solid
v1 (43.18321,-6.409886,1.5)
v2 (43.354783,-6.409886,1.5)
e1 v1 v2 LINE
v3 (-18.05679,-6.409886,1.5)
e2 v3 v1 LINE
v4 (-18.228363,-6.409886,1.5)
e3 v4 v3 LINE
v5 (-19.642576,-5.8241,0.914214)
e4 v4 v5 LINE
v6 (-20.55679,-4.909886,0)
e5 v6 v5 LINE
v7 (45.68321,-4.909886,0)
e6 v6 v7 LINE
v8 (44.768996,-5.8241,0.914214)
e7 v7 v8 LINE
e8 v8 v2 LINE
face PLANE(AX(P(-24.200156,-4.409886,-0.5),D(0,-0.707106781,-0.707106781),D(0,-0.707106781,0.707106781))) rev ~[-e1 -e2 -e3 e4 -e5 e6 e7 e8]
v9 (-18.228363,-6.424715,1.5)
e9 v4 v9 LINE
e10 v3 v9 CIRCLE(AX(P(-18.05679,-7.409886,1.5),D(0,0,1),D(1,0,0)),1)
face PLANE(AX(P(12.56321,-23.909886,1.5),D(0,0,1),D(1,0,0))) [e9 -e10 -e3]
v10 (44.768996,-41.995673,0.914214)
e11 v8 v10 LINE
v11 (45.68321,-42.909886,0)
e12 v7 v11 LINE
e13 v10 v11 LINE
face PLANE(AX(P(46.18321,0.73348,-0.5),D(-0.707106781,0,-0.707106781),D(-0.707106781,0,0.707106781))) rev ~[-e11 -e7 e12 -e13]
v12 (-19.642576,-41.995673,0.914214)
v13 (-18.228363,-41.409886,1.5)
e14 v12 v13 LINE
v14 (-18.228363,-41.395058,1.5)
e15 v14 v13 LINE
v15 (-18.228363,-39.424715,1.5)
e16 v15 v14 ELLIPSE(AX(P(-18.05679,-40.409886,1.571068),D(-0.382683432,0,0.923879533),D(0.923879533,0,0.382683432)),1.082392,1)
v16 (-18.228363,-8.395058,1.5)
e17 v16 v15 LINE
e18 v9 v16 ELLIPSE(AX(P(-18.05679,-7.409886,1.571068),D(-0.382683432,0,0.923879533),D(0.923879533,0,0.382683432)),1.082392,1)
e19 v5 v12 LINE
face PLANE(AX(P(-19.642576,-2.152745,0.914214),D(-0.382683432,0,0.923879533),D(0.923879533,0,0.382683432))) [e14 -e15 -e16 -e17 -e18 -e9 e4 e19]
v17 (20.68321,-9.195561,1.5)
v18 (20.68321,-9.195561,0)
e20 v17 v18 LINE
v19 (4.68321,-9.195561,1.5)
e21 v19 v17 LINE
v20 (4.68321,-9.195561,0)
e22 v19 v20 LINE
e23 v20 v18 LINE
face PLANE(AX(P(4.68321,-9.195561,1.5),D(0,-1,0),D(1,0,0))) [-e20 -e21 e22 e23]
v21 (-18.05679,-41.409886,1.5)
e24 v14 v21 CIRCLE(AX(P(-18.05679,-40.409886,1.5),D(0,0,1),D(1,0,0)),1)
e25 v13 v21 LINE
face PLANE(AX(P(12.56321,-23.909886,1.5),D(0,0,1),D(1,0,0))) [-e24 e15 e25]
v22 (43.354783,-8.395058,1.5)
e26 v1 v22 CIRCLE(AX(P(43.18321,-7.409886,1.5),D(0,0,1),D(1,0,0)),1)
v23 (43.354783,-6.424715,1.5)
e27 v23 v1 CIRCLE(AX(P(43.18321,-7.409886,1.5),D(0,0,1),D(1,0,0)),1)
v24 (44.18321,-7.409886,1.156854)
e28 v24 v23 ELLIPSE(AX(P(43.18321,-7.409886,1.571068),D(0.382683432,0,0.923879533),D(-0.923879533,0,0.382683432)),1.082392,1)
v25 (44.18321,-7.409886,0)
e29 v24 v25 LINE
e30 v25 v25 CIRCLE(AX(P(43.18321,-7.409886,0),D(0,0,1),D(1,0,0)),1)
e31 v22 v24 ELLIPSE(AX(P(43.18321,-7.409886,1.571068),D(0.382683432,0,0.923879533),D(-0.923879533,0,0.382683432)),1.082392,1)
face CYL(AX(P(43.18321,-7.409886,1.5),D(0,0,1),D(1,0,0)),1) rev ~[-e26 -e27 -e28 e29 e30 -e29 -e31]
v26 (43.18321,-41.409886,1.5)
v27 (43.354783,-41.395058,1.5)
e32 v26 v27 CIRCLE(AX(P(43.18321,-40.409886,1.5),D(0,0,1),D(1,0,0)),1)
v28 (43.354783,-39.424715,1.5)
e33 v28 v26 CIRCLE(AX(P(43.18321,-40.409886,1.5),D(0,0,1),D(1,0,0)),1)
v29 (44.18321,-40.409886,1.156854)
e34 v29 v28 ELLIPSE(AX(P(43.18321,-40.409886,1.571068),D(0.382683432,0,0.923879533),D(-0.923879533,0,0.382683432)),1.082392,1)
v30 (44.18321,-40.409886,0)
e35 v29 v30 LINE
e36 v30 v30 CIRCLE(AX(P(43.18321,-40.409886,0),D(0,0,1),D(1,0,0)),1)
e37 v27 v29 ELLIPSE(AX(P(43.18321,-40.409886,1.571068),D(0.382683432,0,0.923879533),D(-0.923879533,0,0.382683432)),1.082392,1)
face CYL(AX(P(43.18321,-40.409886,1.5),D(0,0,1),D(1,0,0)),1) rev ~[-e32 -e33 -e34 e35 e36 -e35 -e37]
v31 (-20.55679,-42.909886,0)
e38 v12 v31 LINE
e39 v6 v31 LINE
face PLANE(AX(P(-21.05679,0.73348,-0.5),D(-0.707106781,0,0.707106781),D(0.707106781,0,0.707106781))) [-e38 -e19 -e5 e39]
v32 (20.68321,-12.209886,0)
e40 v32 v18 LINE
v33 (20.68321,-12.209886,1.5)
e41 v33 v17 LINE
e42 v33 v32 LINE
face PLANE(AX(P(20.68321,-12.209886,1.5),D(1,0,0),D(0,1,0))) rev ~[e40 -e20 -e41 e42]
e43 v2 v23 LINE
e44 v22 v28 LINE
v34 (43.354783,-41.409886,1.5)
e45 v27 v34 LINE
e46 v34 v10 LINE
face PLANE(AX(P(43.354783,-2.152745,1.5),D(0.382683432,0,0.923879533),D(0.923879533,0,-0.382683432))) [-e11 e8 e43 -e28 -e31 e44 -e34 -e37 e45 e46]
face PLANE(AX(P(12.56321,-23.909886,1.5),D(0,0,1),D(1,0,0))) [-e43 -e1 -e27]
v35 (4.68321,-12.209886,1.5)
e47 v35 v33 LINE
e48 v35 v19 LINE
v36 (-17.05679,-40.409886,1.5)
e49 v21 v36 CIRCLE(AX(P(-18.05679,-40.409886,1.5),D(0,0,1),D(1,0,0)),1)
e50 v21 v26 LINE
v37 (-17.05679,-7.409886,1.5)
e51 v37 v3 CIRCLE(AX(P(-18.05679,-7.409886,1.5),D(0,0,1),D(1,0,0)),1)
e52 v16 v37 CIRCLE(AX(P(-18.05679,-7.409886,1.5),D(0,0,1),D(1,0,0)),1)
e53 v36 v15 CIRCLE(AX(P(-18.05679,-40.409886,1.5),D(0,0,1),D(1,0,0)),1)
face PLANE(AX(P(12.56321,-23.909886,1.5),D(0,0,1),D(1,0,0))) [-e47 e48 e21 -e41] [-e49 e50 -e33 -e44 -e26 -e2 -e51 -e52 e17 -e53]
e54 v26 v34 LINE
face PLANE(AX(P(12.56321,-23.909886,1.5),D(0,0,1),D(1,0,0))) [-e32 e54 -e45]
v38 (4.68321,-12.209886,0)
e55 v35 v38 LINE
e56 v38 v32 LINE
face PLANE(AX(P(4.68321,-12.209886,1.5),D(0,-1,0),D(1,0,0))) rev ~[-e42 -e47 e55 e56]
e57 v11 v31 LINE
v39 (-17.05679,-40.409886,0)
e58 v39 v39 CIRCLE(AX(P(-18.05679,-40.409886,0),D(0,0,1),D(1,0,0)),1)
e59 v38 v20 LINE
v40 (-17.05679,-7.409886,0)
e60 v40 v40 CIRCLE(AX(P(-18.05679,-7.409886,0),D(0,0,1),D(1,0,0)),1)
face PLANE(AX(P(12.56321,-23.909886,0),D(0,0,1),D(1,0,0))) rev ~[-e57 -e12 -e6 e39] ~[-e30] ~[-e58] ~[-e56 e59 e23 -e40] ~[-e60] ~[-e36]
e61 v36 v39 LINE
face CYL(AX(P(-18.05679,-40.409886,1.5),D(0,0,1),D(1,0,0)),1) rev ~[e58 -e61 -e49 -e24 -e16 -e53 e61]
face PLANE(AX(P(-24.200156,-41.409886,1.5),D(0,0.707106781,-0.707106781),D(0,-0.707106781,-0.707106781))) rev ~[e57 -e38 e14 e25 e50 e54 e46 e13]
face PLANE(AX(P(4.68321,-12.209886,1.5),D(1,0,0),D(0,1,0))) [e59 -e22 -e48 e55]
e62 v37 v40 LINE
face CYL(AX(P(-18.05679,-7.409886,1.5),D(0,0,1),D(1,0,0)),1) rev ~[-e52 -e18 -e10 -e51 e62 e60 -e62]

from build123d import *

# Parameters (mm, degrees)
F0_W        = 67.24
F0_H        = 39
F1_DEPTH    = 1.5
F2_T1_DEPTH = 49.2867319519
F3_T1_DEPTH = 73.5267319519
F3_T3_DEPTH = 43.5142834408
F4_R        = 1
F5_DEPTH    = 2
F6_W        = 16
F6_H        = 3.0143252599
F7_DEPTH    = 2


# Not quite as in the source:
# - a fillet or chamfer that OpenCascade refuses, or shapes differently, is made with other operations: its cross-section is extruded or revolved along the edge and cut away or added


with BuildPart() as f1:
    # F0 (on Top) → F1 (new body)
    with BuildSketch(Plane.XY):
        with Locations((12.5632099807, -23.9098862686)):
            Rectangle(F0_W, F0_H)
    extrude(amount=F1_DEPTH)

    # F2: chamfer of 2 on 2 edges, made by hand

    # F2_s2 → F2_t1 (cut)
    with BuildSketch(Plane.XZ.offset(-0.7334797074)):
        Polygon((46.1832099807, -0.5), (44.1832099807, 1.5), (46.1832099807, 1.5), align=None)
        Polygon((-21.0567900193, -0.5), (-19.0567900193, 1.5), (-21.0567900193, 1.5), align=None)
    extrude(amount=F2_T1_DEPTH, mode=Mode.SUBTRACT)

    # F3: chamfer of 2 on 4 edges, made by hand

    # F3_s2 → F3_t1 (cut)
    with BuildSketch(Plane.YZ.offset(-24.2001559952)):
        Polygon((-4.4098862686, -0.5), (-6.4098862686, 1.5), (-4.4098862686, 1.5), align=None)
        Polygon((-41.4098862686, 1.5), (-43.4098862686, -0.5), (-43.4098862686, 1.5), align=None)
    extrude(amount=F3_T1_DEPTH, mode=Mode.SUBTRACT)

    # F3_s4 → F3_t3 (cut)
    with BuildSketch(Plane.XZ.offset(2.1527445482)):
        Polygon((43.354782856, 1.5), (44.7689964183, 0.9142135624), (44.1832099807, 1.5), align=None)
        Polygon((-19.6425764569, 0.9142135624), (-18.2283628946, 1.5), (-19.0567900193, 1.5), align=None)
    extrude(amount=F3_T3_DEPTH, mode=Mode.SUBTRACT)

    # F4 (on face) → F5 (cut)
    with BuildSketch(Plane.XY.offset(1.5)):
        with Locations((43.1832099807, -40.4098862686)):
            Circle(F4_R)
        with Locations((43.1832099807, -7.4098862686)):
            Circle(F4_R)
        with Locations((-18.0567900193, -40.4098862686)):
            Circle(F4_R)
        with Locations((-18.0567900193, -7.4098862686)):
            Circle(F4_R)
    extrude(amount=-F5_DEPTH, mode=Mode.SUBTRACT)

    # F6 (on face) → F7 (cut)
    with BuildSketch(Plane.XY.offset(1.5)):
        with Locations((12.6832099807, -10.7027236386)):
            Rectangle(F6_W, F6_H)
    extrude(amount=-F7_DEPTH, mode=Mode.SUBTRACT)


solid = f1.part
